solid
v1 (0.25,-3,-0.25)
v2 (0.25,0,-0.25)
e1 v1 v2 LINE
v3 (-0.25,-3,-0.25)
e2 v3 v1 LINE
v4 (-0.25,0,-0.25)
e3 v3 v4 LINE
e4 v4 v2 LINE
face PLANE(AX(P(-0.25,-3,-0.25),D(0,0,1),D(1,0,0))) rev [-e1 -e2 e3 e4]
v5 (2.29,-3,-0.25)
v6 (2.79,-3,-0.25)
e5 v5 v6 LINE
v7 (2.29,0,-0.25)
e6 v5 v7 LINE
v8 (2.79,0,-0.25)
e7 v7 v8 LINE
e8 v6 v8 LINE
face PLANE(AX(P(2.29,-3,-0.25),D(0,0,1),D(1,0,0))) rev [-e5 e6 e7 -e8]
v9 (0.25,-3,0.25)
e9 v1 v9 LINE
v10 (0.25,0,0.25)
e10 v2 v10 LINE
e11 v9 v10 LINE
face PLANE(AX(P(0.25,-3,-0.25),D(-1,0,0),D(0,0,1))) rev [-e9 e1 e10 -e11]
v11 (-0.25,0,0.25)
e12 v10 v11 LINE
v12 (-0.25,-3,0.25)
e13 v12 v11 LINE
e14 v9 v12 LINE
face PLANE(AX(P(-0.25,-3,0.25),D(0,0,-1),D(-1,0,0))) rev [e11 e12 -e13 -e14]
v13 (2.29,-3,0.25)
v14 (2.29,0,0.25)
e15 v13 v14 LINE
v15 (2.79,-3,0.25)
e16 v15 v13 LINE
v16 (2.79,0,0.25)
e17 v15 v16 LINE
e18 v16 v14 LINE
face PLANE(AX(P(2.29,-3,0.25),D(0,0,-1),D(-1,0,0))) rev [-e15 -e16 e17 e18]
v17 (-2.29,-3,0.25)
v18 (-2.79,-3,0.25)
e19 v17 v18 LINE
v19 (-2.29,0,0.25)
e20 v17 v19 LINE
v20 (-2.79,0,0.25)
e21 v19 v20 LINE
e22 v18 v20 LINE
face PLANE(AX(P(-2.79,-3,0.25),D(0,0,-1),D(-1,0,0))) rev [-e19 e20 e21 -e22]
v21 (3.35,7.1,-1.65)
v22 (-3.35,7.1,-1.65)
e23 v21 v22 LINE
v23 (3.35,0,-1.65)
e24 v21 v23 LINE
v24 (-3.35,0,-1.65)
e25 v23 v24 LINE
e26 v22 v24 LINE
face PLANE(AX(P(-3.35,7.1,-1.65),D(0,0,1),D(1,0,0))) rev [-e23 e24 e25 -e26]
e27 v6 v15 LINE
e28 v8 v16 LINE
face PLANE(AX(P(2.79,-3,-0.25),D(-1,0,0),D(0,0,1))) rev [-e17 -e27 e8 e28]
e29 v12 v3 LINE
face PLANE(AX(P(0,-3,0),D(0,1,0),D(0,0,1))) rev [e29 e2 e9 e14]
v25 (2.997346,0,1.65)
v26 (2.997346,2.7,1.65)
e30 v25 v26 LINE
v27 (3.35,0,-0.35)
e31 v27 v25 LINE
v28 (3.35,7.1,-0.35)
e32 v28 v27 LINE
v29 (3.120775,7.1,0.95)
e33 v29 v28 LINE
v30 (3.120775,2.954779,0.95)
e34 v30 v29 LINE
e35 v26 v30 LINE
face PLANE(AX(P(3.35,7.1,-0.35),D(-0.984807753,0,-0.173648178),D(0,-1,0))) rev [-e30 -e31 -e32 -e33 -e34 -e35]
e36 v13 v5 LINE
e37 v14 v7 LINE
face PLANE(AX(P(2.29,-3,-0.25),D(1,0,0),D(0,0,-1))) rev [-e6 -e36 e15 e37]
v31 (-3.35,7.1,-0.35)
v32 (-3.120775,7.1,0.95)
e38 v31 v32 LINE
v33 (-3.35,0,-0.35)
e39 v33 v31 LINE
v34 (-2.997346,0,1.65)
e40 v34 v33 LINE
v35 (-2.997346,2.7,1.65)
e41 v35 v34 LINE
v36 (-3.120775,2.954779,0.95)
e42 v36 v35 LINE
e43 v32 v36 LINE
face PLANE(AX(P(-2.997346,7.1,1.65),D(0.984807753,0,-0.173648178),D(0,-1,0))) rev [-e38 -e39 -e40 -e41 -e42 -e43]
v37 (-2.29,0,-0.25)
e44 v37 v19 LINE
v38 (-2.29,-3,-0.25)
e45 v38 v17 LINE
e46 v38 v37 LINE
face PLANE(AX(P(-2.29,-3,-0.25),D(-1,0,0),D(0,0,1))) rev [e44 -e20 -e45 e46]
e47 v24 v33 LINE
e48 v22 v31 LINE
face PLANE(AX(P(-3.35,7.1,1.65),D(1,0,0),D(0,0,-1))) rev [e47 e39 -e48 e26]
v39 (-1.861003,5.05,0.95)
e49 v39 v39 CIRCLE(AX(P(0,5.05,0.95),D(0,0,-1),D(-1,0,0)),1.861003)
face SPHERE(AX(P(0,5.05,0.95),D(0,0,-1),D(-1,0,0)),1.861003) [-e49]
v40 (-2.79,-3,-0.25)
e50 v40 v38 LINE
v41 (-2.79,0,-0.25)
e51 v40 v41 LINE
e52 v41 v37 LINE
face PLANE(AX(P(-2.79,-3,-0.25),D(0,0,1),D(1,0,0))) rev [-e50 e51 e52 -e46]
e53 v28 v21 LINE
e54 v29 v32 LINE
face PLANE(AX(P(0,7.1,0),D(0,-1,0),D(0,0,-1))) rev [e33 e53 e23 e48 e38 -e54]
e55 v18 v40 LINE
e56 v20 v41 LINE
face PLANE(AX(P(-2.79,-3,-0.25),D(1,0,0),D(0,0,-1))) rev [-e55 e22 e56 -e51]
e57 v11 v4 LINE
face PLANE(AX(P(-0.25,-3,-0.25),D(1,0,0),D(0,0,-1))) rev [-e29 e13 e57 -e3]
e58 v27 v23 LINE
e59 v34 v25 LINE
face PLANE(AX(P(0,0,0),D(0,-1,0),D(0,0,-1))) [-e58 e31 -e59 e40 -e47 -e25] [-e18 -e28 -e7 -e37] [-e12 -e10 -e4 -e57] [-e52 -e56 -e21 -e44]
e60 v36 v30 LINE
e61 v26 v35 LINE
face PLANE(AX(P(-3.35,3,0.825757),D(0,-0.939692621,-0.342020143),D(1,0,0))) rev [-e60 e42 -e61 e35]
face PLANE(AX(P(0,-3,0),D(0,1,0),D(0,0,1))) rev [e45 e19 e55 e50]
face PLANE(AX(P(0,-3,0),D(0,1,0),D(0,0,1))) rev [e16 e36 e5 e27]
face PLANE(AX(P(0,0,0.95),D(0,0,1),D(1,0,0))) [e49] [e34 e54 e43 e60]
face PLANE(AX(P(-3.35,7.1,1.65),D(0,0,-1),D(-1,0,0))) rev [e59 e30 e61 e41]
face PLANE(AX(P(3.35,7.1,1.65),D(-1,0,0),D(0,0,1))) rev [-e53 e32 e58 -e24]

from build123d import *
from OCP.BRepFilletAPI import BRepFilletAPI_MakeChamfer

# Parameters (mm, degrees)
ESBO_O1_W                = 6.7
ESBO_O1_H                = 3.3
RESSALTO_EXTRUS_O1_DEPTH = 7.1
ESBO_O2_W                = 6.7
ESBO_O2_H                = 4.1
CORTE_EXTRUS_O1_DEPTH    = 0.7
REVOLU_O1_ANGLE          = 180
ESBO_O4_W                = 0.5
ESBO_O4_H                = 0.5
RESSALTO_EXTRUS_O2_DEPTH = 3
CHANFRO1_SIZE            = 0.3
CHANFRO1_SIZE_2          = 0.824243226
CHANFRO2_SIZE            = 2
CHANFRO2_SIZE2           = 0.352653961


with BuildPart() as part:
    # Esboço1 → Ressalto-extrusão1 (new body)
    with BuildSketch(Plane(origin=(0, 0, 0), x_dir=(1, 0, 0), z_dir=(0, 1, 0))):
        Rectangle(ESBO_O1_W, ESBO_O1_H)
    extrude(amount=RESSALTO_EXTRUS_O1_DEPTH)

    # Esboço2 → Corte-extrusão1 (cut)
    with BuildSketch(Plane.XY.offset(1.65)):
        with Locations((0, 5.05)):
            Rectangle(ESBO_O2_W, ESBO_O2_H)
    extrude(amount=-CORTE_EXTRUS_O1_DEPTH, mode=Mode.SUBTRACT)

    # Esboço3 → Revolução1 (revolve)
    with BuildSketch(Plane.XY.offset(0.95)):
        with BuildLine():
            Line((0, 6.911003495), (0, 3.188996505))
            ThreePointArc((0, 3.188996505), (1.861003495, 5.05), (0, 6.911003495))
        make_face()
    revolve(axis=Axis((0, 7.1, 0.95), (0, -1, 0)), revolution_arc=REVOLU_O1_ANGLE)

    # Esboço4 → Ressalto-extrusão2 (add)
    with BuildSketch(Plane.XZ):
        Rectangle(ESBO_O4_W, ESBO_O4_H)
        with Locations((-2.54, 0)):
            Rectangle(ESBO_O4_W, ESBO_O4_H)
        with Locations((2.54, 0)):
            Rectangle(ESBO_O4_W, ESBO_O4_H)
    extrude(amount=RESSALTO_EXTRUS_O2_DEPTH)

    # Chanfro1
    # the kernel refuses this chamfer: 0.824243226, 0.3 mm, written as the material it takes off along each edge
    with BuildSketch(Plane(origin=(5.488247435, 3, 1.65), x_dir=(0, -0.9950833631817485, 0.09904090225205103), z_dir=(-1, 0, 0))) as chanfro1_piece_1_section:
        Polygon((CHANFRO1_SIZE * 0.995083363182, -CHANFRO1_SIZE * 0.0990409022521), (-CHANFRO1_SIZE_2 * 0.0990409022324, -CHANFRO1_SIZE_2 * 0.995083362984), (0, 0), align=None)
    chanfro1_piece_1 = extrude(amount=10.97649487, mode=Mode.PRIVATE)
    chanfro1_piece_1 = split(chanfro1_piece_1, bisect_by=Plane(origin=(0, 2.90340276, 0.95), z_dir=(0, 0, 1)), keep=Keep.TOP, mode=Mode.PRIVATE)
    add(chanfro1_piece_1, mode=Mode.SUBTRACT)

    # Chanfro2: one chamfer whose edges measure the first distance from different faces: ONE call of the kernel's chamfer builder (chamfer() names one face for all edges)
    chanfro2_edges_1 = [part.edges().sort_by_distance(p)[0] for p in [
        (3.35, 1.35, 1.65),
    ]]
    chanfro2_side_1 = [part.faces().sort_by_distance(p)[0] for p in [
        (3.35, 3.34322922, -0.190735653),
    ]]
    chanfro2_edges_2 = [part.edges().sort_by_distance(p)[0] for p in [
        (-3.35, 1.35, 1.65),
    ]]
    chanfro2_side_2 = [part.faces().sort_by_distance(p)[0] for p in [
        (-3.35, 3.34322922, -0.190735653),
    ]]
    chanfro2 = BRepFilletAPI_MakeChamfer(part.part.solid().wrapped)
    for e in chanfro2_edges_1:
        chanfro2.Add(CHANFRO2_SIZE, CHANFRO2_SIZE2, e.wrapped, chanfro2_side_1[0].wrapped)  # the first distance lies on this face
    for e in chanfro2_edges_2:
        chanfro2.Add(CHANFRO2_SIZE, CHANFRO2_SIZE2, e.wrapped, chanfro2_side_2[0].wrapped)  # the first distance lies on this face
    add(Compound.cast(chanfro2.Shape()), mode=Mode.REPLACE)


solid = part.part
